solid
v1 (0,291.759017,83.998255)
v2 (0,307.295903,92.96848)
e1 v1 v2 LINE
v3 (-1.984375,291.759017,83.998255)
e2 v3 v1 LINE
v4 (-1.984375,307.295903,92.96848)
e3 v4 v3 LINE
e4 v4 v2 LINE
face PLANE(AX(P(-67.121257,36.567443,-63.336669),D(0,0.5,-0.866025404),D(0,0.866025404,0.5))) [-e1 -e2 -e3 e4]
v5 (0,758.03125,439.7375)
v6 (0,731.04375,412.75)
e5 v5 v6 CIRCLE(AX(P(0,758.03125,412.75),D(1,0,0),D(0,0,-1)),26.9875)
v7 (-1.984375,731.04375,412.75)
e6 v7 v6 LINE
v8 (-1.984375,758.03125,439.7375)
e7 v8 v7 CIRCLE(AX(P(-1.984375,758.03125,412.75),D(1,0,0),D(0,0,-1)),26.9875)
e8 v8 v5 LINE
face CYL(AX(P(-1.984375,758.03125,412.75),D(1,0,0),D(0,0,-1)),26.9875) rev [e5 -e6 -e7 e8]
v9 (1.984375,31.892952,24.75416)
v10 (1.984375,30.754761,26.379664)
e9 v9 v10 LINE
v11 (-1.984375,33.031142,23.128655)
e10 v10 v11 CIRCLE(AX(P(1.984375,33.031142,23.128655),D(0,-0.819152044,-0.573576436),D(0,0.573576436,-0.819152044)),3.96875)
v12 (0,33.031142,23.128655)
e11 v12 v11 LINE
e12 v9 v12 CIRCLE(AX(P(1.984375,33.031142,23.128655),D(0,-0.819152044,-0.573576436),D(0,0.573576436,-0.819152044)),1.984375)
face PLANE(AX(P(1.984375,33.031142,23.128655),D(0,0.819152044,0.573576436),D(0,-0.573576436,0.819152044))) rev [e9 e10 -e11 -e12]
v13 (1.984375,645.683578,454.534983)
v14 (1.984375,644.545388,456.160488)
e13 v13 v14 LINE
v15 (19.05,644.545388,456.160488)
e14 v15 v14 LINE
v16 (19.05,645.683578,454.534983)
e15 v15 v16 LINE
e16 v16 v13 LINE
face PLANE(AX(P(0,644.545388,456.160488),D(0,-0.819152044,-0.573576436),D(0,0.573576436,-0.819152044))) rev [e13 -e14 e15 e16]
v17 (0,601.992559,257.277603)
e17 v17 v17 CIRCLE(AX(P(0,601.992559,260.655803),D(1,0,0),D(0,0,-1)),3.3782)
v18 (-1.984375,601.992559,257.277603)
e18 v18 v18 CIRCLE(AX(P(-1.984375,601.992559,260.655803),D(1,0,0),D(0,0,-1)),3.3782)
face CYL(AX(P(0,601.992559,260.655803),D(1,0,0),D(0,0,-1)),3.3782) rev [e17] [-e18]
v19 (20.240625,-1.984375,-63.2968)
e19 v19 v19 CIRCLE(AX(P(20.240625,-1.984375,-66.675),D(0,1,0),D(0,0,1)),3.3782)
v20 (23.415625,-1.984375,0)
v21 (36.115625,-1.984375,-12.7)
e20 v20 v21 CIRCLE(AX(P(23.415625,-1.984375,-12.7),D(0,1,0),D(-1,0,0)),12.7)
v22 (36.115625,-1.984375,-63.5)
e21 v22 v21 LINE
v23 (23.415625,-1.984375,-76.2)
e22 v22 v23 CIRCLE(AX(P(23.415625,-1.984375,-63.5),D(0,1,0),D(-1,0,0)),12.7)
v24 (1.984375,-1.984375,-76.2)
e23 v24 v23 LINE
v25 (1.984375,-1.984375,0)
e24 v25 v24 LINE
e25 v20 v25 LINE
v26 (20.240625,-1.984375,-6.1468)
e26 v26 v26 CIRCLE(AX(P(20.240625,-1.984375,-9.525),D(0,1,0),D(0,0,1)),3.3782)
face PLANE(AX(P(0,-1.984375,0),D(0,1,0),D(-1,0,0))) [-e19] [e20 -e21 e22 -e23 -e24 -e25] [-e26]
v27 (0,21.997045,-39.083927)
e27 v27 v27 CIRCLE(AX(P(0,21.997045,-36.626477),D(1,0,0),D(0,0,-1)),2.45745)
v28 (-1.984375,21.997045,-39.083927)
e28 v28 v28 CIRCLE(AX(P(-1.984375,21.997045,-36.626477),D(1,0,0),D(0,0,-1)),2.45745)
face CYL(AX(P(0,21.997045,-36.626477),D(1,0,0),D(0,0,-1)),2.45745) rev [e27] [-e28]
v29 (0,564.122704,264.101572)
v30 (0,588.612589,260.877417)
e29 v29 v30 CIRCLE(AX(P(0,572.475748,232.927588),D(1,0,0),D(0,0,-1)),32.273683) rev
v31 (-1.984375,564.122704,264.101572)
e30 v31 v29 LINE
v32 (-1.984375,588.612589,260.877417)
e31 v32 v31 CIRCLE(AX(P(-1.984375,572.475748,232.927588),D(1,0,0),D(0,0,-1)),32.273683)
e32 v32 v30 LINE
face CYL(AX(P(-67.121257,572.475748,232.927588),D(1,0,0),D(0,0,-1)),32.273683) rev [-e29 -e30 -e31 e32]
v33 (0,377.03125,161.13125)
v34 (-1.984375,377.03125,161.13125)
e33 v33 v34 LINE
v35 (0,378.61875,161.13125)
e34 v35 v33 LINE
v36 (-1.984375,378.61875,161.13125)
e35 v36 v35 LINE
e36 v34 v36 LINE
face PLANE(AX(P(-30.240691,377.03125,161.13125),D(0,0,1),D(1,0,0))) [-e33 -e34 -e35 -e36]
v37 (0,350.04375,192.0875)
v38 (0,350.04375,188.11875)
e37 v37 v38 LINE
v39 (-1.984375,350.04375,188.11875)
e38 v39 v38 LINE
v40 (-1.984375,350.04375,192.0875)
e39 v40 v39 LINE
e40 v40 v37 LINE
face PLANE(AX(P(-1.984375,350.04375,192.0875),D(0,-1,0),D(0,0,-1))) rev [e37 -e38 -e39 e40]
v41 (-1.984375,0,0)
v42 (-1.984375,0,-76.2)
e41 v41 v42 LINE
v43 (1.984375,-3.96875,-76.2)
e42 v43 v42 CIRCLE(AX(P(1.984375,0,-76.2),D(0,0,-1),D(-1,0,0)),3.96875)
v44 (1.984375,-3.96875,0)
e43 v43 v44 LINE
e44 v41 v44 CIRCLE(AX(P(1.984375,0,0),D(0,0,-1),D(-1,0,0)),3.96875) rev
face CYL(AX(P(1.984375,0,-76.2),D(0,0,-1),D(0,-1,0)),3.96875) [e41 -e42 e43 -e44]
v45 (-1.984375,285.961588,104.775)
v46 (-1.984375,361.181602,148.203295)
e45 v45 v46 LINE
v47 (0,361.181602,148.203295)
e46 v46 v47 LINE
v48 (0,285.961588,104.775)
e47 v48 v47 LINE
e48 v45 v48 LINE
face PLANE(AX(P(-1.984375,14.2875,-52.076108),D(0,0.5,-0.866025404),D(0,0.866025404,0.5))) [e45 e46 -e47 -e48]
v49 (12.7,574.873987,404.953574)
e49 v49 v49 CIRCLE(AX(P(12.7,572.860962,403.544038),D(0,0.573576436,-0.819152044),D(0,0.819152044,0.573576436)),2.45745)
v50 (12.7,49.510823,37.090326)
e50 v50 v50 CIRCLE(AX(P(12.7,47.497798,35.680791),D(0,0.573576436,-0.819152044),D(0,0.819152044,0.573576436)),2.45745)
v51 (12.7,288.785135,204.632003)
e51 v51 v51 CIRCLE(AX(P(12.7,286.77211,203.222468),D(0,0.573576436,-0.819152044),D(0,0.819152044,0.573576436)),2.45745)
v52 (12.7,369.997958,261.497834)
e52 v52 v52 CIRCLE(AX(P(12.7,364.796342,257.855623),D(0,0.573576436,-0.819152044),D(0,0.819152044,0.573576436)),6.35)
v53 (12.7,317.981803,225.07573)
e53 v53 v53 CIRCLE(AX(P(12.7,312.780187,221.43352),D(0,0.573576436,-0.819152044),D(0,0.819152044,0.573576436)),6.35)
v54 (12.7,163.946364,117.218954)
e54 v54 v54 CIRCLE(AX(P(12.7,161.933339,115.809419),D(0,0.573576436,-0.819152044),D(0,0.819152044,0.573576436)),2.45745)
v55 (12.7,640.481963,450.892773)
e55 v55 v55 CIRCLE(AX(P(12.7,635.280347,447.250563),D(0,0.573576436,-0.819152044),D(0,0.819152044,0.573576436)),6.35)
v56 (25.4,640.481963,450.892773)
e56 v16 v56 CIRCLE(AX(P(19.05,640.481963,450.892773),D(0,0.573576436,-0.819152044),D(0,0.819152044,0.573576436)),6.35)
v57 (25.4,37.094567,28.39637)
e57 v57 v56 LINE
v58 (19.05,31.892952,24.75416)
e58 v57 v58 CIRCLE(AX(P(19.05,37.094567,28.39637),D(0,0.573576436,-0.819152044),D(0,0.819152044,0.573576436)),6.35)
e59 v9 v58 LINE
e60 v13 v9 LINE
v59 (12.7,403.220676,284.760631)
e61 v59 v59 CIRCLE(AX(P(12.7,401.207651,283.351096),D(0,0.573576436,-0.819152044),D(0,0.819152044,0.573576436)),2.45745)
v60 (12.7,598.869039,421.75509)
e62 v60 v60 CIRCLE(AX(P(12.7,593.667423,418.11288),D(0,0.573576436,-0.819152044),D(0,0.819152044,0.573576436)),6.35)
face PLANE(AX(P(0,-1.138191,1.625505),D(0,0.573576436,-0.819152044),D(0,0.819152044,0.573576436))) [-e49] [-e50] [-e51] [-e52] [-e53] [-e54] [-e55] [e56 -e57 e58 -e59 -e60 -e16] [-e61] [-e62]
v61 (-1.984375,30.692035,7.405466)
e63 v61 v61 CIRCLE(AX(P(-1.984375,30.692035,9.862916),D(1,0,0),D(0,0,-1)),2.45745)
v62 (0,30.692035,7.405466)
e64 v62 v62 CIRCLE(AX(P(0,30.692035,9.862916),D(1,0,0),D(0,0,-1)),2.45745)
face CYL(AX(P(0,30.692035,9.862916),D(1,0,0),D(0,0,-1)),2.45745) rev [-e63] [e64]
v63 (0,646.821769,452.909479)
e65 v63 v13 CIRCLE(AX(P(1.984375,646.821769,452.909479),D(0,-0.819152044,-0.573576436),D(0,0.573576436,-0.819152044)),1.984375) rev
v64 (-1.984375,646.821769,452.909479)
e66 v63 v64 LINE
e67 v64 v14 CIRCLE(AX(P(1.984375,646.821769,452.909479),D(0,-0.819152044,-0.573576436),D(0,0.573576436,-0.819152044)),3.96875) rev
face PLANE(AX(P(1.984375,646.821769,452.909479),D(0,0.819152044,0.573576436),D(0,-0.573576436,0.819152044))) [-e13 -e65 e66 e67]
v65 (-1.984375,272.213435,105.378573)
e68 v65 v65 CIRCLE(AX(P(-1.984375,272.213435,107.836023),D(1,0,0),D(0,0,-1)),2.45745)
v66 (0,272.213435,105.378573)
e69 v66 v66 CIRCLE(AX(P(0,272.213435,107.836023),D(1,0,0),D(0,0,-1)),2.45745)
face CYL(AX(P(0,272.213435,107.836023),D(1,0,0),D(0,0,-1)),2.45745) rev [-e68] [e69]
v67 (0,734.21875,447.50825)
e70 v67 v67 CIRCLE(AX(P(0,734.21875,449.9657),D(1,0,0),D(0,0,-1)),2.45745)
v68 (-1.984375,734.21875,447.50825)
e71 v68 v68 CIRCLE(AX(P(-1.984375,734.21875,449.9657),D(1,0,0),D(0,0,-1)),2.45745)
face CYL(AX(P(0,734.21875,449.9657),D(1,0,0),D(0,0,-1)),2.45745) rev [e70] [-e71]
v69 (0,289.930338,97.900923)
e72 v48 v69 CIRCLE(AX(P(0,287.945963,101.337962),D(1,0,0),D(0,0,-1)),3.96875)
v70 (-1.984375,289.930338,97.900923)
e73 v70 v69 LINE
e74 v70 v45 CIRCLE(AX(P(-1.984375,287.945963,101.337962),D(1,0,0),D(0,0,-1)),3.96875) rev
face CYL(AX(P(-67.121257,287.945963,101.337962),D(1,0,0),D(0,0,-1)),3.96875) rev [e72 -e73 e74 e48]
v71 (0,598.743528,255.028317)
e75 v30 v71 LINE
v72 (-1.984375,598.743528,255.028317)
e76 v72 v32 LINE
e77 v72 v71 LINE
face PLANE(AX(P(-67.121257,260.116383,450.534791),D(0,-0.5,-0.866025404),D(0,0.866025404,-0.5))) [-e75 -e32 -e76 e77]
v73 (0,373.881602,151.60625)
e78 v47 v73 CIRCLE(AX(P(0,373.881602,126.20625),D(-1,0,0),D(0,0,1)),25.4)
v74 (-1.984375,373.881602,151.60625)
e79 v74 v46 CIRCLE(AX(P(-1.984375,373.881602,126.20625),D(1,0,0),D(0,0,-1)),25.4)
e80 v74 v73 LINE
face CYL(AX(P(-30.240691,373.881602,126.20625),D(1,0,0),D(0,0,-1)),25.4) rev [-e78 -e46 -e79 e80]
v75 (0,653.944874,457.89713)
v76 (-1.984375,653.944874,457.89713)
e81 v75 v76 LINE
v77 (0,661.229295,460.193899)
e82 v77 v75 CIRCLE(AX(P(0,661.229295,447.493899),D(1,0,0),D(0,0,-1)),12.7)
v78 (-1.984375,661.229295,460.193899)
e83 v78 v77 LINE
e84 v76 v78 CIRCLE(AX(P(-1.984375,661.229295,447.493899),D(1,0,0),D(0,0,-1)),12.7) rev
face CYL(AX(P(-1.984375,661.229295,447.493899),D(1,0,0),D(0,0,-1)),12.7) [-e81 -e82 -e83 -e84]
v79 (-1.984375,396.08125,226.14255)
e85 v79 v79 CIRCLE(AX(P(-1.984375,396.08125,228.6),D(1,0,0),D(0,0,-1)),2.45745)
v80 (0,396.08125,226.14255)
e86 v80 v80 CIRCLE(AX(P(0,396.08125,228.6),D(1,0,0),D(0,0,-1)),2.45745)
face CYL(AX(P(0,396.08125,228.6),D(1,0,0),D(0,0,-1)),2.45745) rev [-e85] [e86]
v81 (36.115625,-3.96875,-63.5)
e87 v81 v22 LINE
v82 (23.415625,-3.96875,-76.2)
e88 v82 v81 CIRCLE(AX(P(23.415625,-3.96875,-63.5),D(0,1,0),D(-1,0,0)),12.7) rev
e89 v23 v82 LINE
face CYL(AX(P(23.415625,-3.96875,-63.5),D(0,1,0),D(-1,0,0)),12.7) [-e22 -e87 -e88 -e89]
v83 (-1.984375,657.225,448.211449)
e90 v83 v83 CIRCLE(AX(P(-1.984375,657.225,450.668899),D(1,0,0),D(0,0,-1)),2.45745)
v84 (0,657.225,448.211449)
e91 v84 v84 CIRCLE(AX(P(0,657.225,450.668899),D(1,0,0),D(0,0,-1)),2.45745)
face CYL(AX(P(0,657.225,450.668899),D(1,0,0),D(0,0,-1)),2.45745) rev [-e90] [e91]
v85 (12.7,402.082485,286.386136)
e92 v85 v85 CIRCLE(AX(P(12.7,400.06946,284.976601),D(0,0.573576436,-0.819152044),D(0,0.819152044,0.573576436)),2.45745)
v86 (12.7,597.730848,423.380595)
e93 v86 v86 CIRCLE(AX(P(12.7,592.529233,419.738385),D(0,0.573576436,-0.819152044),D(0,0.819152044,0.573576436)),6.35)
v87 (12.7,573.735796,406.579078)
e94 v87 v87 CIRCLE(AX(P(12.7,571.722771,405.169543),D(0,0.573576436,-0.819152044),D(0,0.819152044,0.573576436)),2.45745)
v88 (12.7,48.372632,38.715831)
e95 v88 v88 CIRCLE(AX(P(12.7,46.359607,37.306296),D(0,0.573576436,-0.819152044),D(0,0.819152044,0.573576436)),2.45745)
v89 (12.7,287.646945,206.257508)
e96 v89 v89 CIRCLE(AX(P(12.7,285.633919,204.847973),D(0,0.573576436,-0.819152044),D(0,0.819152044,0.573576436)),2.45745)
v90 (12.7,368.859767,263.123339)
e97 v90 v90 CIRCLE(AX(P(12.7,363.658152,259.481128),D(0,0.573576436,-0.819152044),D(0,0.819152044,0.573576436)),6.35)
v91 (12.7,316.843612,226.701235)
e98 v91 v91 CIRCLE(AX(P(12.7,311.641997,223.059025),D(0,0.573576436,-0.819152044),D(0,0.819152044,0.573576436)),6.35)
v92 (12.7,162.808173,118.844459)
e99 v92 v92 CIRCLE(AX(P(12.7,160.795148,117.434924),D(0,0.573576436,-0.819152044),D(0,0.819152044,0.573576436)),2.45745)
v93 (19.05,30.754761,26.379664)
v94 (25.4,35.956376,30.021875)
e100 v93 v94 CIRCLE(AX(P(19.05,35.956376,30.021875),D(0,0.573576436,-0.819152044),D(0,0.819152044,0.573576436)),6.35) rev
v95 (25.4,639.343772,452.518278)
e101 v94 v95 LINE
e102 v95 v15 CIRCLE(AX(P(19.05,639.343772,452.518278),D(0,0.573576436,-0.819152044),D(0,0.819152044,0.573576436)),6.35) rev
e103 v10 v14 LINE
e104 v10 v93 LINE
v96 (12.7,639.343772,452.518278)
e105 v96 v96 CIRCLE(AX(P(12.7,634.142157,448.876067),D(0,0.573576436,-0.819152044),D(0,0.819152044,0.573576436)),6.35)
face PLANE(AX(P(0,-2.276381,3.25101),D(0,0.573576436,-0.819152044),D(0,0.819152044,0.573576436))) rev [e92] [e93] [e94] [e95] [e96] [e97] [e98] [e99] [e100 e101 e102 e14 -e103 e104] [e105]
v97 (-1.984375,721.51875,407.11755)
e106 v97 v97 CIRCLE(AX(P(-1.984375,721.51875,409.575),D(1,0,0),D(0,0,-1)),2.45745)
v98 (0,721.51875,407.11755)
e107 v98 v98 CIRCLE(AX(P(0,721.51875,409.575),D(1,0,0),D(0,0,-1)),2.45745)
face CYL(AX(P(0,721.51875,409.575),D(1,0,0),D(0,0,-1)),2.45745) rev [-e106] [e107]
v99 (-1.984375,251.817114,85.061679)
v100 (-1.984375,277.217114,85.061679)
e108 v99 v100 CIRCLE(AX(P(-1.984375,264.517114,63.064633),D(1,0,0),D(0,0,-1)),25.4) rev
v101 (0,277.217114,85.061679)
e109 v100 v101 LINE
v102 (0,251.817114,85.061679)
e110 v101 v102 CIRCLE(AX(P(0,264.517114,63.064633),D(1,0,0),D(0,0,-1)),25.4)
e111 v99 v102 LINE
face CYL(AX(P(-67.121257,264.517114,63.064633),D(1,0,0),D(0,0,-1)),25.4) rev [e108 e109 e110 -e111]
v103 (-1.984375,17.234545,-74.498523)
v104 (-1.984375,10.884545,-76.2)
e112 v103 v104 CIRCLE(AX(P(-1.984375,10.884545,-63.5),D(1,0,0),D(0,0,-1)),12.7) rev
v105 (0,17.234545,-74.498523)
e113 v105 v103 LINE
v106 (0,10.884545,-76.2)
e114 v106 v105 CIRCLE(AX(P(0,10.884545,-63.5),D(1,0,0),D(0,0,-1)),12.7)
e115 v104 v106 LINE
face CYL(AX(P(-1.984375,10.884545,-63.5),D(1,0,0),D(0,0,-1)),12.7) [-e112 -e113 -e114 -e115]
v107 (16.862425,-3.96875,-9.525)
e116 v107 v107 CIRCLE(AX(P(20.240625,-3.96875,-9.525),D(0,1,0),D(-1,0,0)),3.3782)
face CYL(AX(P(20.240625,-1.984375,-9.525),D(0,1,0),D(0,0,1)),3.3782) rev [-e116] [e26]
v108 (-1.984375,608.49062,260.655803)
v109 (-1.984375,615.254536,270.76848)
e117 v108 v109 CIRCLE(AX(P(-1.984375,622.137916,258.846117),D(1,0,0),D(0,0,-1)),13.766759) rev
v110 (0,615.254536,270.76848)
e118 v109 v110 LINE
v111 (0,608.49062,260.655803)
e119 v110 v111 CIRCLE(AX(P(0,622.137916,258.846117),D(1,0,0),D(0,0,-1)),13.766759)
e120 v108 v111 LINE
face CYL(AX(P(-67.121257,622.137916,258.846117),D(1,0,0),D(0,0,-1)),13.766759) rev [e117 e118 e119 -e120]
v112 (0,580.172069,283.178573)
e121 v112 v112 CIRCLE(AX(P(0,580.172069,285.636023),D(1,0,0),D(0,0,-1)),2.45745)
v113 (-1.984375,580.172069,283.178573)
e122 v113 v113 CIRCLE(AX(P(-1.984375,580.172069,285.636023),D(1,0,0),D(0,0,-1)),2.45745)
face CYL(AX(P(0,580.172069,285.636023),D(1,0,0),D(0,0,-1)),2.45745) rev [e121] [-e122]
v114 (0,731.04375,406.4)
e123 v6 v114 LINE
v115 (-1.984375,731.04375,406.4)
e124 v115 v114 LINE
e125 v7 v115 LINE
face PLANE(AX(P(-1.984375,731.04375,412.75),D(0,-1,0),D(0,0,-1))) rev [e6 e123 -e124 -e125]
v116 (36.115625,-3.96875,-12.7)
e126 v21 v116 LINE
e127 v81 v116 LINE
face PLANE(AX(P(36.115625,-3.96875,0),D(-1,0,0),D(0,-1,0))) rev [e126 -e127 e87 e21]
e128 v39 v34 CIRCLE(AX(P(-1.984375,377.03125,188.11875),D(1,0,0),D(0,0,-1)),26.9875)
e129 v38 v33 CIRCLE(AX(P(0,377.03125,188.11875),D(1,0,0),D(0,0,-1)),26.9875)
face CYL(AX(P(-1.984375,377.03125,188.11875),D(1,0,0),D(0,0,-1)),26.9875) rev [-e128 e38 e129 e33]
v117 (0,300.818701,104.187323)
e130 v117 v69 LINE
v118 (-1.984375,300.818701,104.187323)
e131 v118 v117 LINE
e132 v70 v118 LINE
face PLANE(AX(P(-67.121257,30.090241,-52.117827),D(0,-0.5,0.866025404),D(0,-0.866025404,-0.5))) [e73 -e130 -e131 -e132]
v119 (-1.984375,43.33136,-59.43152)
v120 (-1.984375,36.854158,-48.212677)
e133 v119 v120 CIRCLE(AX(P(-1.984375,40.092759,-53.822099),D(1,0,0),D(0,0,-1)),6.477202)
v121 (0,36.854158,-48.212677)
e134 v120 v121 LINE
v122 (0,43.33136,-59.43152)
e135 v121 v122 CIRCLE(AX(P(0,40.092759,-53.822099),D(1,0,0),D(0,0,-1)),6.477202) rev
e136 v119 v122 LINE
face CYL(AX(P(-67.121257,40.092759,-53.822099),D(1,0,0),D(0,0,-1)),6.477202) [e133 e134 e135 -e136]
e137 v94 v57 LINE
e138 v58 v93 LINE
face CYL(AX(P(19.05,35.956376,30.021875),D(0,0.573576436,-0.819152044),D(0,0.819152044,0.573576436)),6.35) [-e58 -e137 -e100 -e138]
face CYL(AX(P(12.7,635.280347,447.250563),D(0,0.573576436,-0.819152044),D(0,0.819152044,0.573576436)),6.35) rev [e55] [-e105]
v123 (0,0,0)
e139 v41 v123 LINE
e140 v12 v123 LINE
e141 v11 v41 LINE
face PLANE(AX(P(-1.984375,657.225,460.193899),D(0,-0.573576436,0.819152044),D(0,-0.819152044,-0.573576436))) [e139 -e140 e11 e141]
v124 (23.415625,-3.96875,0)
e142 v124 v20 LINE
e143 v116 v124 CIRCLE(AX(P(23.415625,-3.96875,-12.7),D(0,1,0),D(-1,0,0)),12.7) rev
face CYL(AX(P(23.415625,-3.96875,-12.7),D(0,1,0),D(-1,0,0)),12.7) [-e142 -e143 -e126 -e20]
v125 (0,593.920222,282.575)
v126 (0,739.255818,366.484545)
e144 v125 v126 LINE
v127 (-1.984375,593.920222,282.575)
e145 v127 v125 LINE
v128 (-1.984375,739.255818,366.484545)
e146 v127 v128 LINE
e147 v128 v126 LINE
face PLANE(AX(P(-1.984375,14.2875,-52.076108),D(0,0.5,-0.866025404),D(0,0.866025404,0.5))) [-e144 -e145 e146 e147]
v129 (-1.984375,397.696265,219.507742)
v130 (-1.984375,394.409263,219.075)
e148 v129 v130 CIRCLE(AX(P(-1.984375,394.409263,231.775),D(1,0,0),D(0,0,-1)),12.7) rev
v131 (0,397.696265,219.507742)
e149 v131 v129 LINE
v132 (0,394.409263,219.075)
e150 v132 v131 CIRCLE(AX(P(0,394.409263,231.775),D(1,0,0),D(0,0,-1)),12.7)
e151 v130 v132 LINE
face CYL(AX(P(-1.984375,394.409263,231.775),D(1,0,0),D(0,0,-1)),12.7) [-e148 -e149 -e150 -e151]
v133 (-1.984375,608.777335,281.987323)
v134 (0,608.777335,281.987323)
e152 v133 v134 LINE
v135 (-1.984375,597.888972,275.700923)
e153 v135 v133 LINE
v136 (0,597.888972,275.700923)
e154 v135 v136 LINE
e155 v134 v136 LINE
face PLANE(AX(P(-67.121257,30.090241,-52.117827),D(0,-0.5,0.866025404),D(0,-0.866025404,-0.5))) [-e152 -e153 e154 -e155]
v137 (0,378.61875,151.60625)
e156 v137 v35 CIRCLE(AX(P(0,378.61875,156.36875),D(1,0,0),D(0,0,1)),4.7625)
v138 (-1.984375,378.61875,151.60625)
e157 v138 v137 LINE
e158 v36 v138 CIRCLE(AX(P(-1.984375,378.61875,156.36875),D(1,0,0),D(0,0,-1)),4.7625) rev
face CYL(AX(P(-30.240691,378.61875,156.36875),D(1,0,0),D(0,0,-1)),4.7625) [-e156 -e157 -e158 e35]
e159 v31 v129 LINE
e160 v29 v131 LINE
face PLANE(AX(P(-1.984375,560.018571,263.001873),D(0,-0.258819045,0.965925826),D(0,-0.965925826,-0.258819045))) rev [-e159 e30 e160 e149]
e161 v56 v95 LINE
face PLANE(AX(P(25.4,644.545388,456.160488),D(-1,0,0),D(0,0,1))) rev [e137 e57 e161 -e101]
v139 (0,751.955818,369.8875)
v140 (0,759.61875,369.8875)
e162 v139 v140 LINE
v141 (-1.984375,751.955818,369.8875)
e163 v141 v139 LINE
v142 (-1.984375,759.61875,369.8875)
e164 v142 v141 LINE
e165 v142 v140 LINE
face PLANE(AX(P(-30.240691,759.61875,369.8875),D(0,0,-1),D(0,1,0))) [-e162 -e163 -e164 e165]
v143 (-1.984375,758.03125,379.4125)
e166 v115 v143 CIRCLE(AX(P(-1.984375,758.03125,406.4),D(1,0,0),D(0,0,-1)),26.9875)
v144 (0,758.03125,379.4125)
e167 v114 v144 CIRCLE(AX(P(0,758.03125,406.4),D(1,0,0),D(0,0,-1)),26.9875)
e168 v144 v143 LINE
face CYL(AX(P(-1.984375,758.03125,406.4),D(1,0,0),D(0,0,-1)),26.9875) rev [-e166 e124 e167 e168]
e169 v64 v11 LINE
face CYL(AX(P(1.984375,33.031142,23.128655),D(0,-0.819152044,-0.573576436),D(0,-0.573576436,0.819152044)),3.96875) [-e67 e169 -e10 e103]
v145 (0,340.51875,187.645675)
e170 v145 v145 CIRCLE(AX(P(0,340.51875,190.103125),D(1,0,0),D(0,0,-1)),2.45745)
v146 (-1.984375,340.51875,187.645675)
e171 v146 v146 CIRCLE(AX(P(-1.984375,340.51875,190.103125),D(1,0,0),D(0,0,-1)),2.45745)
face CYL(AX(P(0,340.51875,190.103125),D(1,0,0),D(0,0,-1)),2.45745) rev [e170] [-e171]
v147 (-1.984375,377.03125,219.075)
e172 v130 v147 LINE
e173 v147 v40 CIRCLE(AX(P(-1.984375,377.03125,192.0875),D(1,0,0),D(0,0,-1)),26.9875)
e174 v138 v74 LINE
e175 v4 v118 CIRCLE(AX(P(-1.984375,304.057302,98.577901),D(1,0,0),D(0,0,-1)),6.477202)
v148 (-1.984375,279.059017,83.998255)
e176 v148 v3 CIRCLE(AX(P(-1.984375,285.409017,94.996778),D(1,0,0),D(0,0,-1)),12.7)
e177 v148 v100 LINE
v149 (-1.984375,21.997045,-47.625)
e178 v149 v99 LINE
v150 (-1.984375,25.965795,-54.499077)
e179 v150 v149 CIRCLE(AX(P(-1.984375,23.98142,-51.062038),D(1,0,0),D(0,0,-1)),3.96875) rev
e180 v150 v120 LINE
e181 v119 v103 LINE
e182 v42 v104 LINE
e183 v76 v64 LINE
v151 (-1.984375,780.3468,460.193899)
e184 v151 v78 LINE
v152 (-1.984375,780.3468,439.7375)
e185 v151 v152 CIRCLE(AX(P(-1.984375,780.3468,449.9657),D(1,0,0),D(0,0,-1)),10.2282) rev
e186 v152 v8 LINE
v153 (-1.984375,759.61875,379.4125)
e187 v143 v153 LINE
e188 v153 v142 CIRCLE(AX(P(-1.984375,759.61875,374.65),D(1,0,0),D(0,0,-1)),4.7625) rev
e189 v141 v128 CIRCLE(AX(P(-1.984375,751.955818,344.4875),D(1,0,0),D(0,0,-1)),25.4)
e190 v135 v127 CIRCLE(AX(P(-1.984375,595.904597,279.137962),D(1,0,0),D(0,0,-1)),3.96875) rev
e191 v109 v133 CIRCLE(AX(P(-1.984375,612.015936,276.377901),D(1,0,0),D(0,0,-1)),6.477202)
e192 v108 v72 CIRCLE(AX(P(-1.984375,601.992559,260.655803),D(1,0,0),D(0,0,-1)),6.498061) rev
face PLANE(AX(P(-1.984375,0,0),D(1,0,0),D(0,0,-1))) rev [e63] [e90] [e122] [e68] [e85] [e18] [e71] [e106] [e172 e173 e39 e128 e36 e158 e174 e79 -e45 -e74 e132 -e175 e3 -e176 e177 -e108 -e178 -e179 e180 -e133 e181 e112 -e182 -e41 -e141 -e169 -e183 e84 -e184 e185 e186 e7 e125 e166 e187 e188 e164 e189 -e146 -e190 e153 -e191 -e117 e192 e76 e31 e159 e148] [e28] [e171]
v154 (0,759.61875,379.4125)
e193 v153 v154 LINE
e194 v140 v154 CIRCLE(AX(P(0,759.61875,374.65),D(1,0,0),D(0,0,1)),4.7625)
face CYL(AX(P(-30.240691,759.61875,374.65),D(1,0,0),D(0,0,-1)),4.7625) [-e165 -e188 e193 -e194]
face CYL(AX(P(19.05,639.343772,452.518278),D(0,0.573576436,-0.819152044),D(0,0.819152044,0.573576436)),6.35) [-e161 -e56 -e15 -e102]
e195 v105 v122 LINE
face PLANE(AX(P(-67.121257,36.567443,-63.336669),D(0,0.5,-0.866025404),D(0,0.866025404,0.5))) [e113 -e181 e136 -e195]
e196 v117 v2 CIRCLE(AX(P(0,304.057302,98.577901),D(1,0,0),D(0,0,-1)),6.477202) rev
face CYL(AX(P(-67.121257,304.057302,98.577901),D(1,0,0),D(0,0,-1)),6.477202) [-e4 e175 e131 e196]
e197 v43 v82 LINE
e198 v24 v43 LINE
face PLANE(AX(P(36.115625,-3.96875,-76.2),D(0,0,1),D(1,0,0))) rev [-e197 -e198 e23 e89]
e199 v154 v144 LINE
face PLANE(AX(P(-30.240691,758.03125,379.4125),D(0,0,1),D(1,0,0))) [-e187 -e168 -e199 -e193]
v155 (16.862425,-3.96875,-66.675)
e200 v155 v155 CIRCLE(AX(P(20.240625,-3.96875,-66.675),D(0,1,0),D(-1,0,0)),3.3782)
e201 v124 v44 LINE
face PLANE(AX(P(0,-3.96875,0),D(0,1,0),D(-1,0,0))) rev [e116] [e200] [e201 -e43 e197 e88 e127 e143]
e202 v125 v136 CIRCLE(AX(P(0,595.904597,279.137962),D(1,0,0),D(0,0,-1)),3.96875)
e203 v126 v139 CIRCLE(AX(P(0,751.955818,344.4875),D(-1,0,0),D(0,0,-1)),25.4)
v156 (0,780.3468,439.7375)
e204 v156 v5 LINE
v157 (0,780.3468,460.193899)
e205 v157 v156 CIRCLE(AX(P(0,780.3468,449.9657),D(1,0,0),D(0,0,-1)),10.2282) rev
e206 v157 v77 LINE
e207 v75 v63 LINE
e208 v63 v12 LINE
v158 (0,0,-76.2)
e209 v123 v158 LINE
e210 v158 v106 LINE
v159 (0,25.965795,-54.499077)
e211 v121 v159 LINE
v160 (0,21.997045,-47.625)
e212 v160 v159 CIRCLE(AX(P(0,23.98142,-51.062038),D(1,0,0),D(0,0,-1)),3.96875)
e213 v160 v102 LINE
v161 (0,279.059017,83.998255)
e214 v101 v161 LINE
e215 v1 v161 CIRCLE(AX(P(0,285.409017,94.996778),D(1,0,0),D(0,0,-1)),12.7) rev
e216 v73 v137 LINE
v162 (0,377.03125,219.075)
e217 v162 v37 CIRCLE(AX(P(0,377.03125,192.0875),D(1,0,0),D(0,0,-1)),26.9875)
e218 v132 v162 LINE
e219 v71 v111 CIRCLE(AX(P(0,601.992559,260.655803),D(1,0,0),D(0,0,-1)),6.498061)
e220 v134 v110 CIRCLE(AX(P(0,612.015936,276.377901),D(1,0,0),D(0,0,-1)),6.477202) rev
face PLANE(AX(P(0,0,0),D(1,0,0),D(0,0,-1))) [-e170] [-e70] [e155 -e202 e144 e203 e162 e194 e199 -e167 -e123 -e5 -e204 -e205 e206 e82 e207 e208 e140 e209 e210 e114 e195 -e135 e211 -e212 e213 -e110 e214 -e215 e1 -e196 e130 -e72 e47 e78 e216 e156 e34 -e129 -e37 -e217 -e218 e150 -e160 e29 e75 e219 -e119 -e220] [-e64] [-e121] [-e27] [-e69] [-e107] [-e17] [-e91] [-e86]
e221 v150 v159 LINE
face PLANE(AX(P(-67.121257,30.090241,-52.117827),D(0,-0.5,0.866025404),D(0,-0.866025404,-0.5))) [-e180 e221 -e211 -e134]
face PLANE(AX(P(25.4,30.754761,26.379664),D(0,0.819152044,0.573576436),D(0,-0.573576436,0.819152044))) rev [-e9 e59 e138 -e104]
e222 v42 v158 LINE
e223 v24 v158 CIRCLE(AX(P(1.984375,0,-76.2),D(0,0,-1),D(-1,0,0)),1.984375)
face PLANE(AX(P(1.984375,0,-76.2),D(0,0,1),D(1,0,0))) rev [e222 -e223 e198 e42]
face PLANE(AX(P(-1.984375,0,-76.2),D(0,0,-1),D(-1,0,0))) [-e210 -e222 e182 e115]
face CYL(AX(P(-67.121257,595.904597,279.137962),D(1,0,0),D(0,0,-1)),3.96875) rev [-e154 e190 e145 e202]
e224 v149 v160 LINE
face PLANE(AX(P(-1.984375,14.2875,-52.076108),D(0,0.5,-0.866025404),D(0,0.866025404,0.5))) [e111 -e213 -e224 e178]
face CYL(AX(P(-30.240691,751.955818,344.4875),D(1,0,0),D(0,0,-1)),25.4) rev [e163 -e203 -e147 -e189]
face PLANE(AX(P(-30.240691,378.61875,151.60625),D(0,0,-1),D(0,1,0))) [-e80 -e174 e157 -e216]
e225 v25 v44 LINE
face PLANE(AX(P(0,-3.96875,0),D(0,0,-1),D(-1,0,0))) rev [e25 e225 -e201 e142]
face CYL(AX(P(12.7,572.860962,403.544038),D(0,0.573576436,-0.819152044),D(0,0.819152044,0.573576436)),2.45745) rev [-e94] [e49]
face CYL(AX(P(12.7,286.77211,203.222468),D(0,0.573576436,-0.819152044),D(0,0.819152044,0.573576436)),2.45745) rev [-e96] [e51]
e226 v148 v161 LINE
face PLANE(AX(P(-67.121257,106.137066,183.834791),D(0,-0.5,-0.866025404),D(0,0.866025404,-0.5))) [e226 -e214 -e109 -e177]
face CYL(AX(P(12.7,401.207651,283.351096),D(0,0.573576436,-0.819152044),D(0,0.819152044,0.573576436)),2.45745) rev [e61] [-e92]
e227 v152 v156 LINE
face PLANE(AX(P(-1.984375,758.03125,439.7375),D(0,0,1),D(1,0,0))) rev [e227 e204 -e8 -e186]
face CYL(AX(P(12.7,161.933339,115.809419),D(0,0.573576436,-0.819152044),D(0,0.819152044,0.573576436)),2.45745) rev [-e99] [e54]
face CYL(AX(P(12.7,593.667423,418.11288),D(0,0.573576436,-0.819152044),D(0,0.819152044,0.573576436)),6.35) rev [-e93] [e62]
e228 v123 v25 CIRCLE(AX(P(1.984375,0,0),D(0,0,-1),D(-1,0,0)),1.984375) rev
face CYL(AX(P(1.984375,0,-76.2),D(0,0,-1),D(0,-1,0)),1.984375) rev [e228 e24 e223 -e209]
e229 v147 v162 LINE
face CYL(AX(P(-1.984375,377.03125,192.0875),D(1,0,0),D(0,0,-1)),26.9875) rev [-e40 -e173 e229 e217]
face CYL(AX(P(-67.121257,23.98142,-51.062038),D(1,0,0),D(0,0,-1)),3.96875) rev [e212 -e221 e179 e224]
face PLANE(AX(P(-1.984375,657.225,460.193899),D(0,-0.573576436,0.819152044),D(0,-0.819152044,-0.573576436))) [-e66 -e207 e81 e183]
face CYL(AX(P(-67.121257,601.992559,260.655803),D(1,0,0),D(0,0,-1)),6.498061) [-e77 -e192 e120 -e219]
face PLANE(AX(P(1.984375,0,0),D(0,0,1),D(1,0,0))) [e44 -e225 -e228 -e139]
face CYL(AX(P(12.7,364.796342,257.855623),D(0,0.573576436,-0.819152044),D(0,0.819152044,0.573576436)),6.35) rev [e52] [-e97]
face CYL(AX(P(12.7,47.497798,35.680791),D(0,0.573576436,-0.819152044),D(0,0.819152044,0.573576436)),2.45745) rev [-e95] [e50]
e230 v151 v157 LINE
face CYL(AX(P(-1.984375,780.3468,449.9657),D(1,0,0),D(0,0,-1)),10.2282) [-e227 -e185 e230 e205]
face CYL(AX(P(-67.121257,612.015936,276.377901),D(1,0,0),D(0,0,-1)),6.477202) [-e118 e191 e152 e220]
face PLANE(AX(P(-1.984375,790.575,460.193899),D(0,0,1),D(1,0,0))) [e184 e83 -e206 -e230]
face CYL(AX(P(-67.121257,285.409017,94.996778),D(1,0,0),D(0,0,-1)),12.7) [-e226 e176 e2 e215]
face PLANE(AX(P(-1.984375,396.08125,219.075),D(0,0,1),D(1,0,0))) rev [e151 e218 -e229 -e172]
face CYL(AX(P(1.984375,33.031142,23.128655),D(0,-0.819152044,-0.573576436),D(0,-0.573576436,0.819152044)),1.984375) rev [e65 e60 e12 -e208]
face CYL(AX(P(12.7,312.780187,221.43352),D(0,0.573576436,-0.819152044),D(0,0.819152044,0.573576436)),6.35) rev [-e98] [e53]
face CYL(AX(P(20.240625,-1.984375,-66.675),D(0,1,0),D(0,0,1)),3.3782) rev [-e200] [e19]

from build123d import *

# Parameters (mm, degrees)
BASE_FLANGE1_DEPTH                = 1.984375
LOW_RING_SLOT_ONLY_DEPTH          = 915.762916455
HIGH_RING_SLOT_ONLY_DEPTH         = 915.762916455
RING_HOLES_VERTICAL_DEPTH         = 915.762916455
HOOKS_DEPTH                       = 1.984375
CHAIN_PIN_HOLE_D                  = 6.7564
RING_RETAINER_LIP_DEPTH           = 1.984375
ROUNDING_TOP_DEPTH                = 915.762916455
BACK_FLANGE_DEPTH                 = 749.3
BOTTOM_FLANGE_DEPTH               = 76.2
RIVET_HOLES_HOLE_WIZARD_D         = 4.9149
ROUNDING_REMAINING_EDGES_R        = 12.7
BOLT_TO_BASE_HOLE_WIZARD_D        = 6.7564
HOLES_FOR_120LB_CABLE_TIES_D      = 12.7
RIVETS_TO_BACKING_PART_D          = 4.9149
FILLET_FOR_FLANGE_TO_BACK_PIECE_R = 6.35
FILLET_FOR_BOTTOM_FLANGE_R        = 12.7


# Sheet-metal steps are written as plain solids
with BuildPart() as part:
    # Sketch1 → Base-Flange1 (new body)
    with BuildSketch(Plane(origin=(0, 0, 0), x_dir=(0, 0, -1), z_dir=(1, 0, 0))):
        Polygon((-460.1938993, 657.225), (0, 0), (76.2, 0), (76.2, 14.2875), (52.076108029, 14.2875), (-396.113689065, 790.575), (-460.1938993, 790.575), align=None)
    extrude(amount=-BASE_FLANGE1_DEPTH)

    # Sketch2 → low ring slot only (cut, through all)
    with BuildSketch(Plane(origin=(0, 0, 0), x_dir=(0, 0, -1), z_dir=(1, 0, 0))):
        with BuildLine():
            Line((-192.0875, 404.01875), (-188.11875, 404.01875))
            ThreePointArc((-188.11875, 404.01875), (-161.13125, 377.03125), (-188.11875, 350.04375))
            Line((-188.11875, 350.04375), (-192.0875, 350.04375))
            ThreePointArc((-192.0875, 350.04375), (-219.075, 377.03125), (-192.0875, 404.01875))
        make_face()
    extrude(amount=-LOW_RING_SLOT_ONLY_DEPTH, mode=Mode.SUBTRACT)

    # Sketch3 → high ring slot only (cut, through all)
    with BuildSketch(Plane(origin=(0, 0, 0), x_dir=(0, 0, -1), z_dir=(1, 0, 0))):
        with BuildLine():
            Line((-412.75, 785.01875), (-406.4, 785.01875))
            ThreePointArc((-406.4, 785.01875), (-379.4125, 758.03125), (-406.4, 731.04375))
            Line((-406.4, 731.04375), (-412.75, 731.04375))
            ThreePointArc((-412.75, 731.04375), (-439.7375, 758.03125), (-412.75, 785.01875))
        make_face()
    extrude(amount=-HIGH_RING_SLOT_ONLY_DEPTH, mode=Mode.SUBTRACT)

    # Sketch6 → ring holes vertical (cut, through all)
    with BuildSketch(Plane(origin=(0, 0, 0), x_dir=(0, 0, -1), z_dir=(1, 0, 0))):
        Polygon((-157.35409368, 377.03125), (-263.001872817, 560.018571172), (-219.075, 396.08125), (-219.075, 377.03125), (-161.13125, 377.03125), align=None)
        Polygon((-439.7375, 758.03125), (-439.7375, 790.575), (-396.113689065, 790.575), (-377.324546242, 758.03125), (-379.4125, 758.03125), align=None)
    extrude(amount=-RING_HOLES_VERTICAL_DEPTH, mode=Mode.SUBTRACT)

    # Sketch4 → hooks (add)
    with BuildSketch(Plane(origin=(0, 0, 0), x_dir=(0, 0, -1), z_dir=(1, 0, 0))):
        with BuildLine():
            ThreePointArc((54.499076643, 25.965795256), (53.046413321, 20.544381935), (47.625, 21.997045256))
            Line((47.625, 21.997045256), (52.076108029, 14.2875))
            Line((52.076108029, 14.2875), (76.2, 14.2875))
            Line((76.2, 14.2875), (59.4315198, 43.331359673))
            ThreePointArc((59.4315198, 43.331359673), (50.58349781, 45.702180019), (48.212677464, 36.85415803))
            Line((48.212677464, 36.85415803), (54.499076643, 25.965795256))
        make_face()
        with BuildLine():
            ThreePointArc((-97.900923357, 289.93033833), (-99.353586679, 284.508925008), (-104.775, 285.96158833))
            Line((-104.775, 285.96158833), (-85.061678589, 251.817114059))
            ThreePointArc((-85.061678589, 251.817114059), (-88.464633332, 264.517114059), (-85.061678589, 277.217114059))
            Line((-85.061678589, 277.217114059), (-83.998255231, 279.059017344))
            ThreePointArc((-83.998255231, 279.059017344), (-82.296777859, 285.409017344), (-83.998255231, 291.759017344))
            Line((-83.998255231, 291.759017344), (-92.9684802, 307.295902746))
            ThreePointArc((-92.9684802, 307.295902746), (-101.81650219, 309.666723093), (-104.187322536, 300.818701104))
            Line((-104.187322536, 300.818701104), (-97.900923357, 289.93033833))
        make_face()
        with BuildLine():
            ThreePointArc((-264.101571882, 564.122703953), (-264.925165118, 576.688308533), (-260.877417362, 588.612588904))
            Line((-260.877417362, 588.612588904), (-255.028316879, 598.743528119))
            ThreePointArc((-255.028316879, 598.743528119), (-255.028316879, 605.241589069), (-260.655802737, 608.490619543))
            ThreePointArc((-260.655802737, 608.490619543), (-266.499869955, 610.694851427), (-270.7684802, 615.254536332))
            ThreePointArc((-270.7684802, 615.254536332), (-279.61650219, 617.625356679), (-281.987322536, 608.77733469))
            Line((-281.987322536, 608.77733469), (-275.700923357, 597.888971915))
            ThreePointArc((-275.700923357, 597.888971915), (-277.153586679, 592.467558594), (-282.575, 593.920221915))
            Line((-282.575, 593.920221915), (-263.001872817, 560.018571172))
            Line((-263.001872817, 560.018571172), (-264.101571882, 564.122703953))
        make_face()
    extrude(amount=-HOOKS_DEPTH)

    # chain pin hole (through all)
    with Locations(Plane(origin=(0, 0, 0), x_dir=(0, 0, -1), z_dir=(1, 0, 0))):
        with Locations((-260.655802737, 601.992558594)):
            Hole(CHAIN_PIN_HOLE_D / 2)

    # Sketch7 → ring retainer lip (add)
    with BuildSketch(Plane(origin=(0, 0, 0), x_dir=(0, 0, -1), z_dir=(1, 0, 0))):
        with BuildLine():
            Line((-161.13125, 377.03125), (-161.13125, 378.61875))
            ThreePointArc((-161.13125, 378.61875), (-156.36875, 383.38125), (-151.60625, 378.61875))
            Line((-151.60625, 378.61875), (-151.60625, 373.881602199))
            ThreePointArc((-151.60625, 373.881602199), (-150.740765988, 367.307598454), (-148.203295256, 361.181602199))
            Line((-148.203295256, 361.181602199), (-157.35409368, 377.03125))
            Line((-157.35409368, 377.03125), (-161.13125, 377.03125))
        make_face()
        with BuildLine():
            Line((-379.4125, 758.03125), (-379.4125, 759.61875))
            ThreePointArc((-379.4125, 759.61875), (-374.65, 764.38125), (-369.8875, 759.61875))
            Line((-369.8875, 759.61875), (-369.8875, 751.955817539))
            ThreePointArc((-369.8875, 751.955817539), (-369.022015988, 745.381813793), (-366.484545256, 739.255817539))
            Line((-366.484545256, 739.255817539), (-377.324546242, 758.03125))
            Line((-377.324546242, 758.03125), (-379.4125, 758.03125))
        make_face()
    extrude(amount=-RING_RETAINER_LIP_DEPTH)

    # Sketch9 → rounding top (cut, through all)
    with BuildSketch(Plane(origin=(0, 0, 0), x_dir=(0, 0, -1), z_dir=(1, 0, 0))):
        with BuildLine():
            Line((-460.1938993, 790.575), (-460.1938993, 780.34680035))
            ThreePointArc((-460.1938993, 780.34680035), (-457.198128982, 787.579229682), (-449.96569965, 790.575))
            Line((-449.96569965, 790.575), (-460.1938993, 790.575))
        make_face()
        with BuildLine():
            Line((-439.7375, 790.575), (-449.96569965, 790.575))
            ThreePointArc((-449.96569965, 790.575), (-442.733270318, 787.579229682), (-439.7375, 780.34680035))
            Line((-439.7375, 780.34680035), (-439.7375, 790.575))
        make_face()
    extrude(amount=-ROUNDING_TOP_DEPTH, mode=Mode.SUBTRACT)

    # back flange section (across the edge) → back flange (add)
    with BuildSketch(Plane(origin=(0, 645.683578297, 454.534983396), x_dir=(3.4914813388431334e-15, 0.5735764363510447, -0.8191520442889929), z_dir=(0, -0.8191520442889929, -0.5735764363510447))):
        with BuildLine():
            Line((-1.984375, 1.984375), (-1.984375, 25.4))
            Line((-1.984375, 25.4), (0, 25.4))
            Line((0, 25.4), (0, 1.984375))
            ThreePointArc((0, 1.984375), (0.581209981, 0.581209981), (1.984375, 0))
            Line((1.984375, 0), (1.984375, -1.984375))
            ThreePointArc((1.984375, -1.984375), (-0.821955038, -0.821955038), (-1.984375, 1.984375))
        make_face()
    extrude(amount=BACK_FLANGE_DEPTH)

    # bottom flange section (across the edge) → bottom flange (add)
    with BuildSketch(Plane(origin=(0, -1.984375, 0), x_dir=(0, 1, 0), z_dir=(0, 0, -1))):
        with BuildLine():
            Line((-1.984375, 1.984375), (-1.984375, 36.115625))
            Line((-1.984375, 36.115625), (0, 36.115625))
            Line((0, 36.115625), (0, 1.984375))
            ThreePointArc((0, 1.984375), (0.581209981, 0.581209981), (1.984375, 0))
            Line((1.984375, 0), (1.984375, -1.984375))
            ThreePointArc((1.984375, -1.984375), (-0.821955038, -0.821955038), (-1.984375, 1.984375))
        make_face()
    extrude(amount=BOTTOM_FLANGE_DEPTH)

    # rivet holes hole wizard (through all)
    with Locations(Plane(origin=(0, 0, 0), x_dir=(0, 0, -1), z_dir=(1, 0, 0))):
        with Locations((-449.96569965, 734.21875), (-409.575, 721.51875), (-450.6688993, 657.225), (-285.636022628, 580.17206863), (-228.6, 396.08125), (-190.103125, 340.51875), (-107.836022628, 272.213435045), (-9.862916022, 30.692034586), (36.626477372, 21.997045256)):
            Hole(RIVET_HOLES_HOLE_WIZARD_D / 2)

    # rounding remaining edges
    rounding_remaining_edges_edges = [part.edges().sort_by_distance(p)[0] for p in [
        (-0.9921875, 657.225, 460.1938993),
        (-0.9921875, 14.2875, -76.2),
        (-0.9921875, 396.08125, 219.075),
    ]]
    fillet(rounding_remaining_edges_edges, radius=ROUNDING_REMAINING_EDGES_R)

    # bolt to base hole wizard (through all)
    with Locations(Plane(origin=(0, -1.984375, 0), x_dir=(1, 0, 0), z_dir=(0, 1, 0))):
        with Locations((20.240625, 66.675), (20.240625, 9.525)):
            Hole(BOLT_TO_BASE_HOLE_WIZARD_D / 2)

    # holes for 120lb cable ties (through all)
    with Locations(Plane(origin=(0, -1.138190741, 1.625504838), x_dir=(-1, 0, 0), z_dir=(3.580478189914983e-15, 0.5735764363510447, -0.8191520442889927))):
        with Locations((-12.7, 776.923579099), (-12.7, 726.123579099), (-12.7, 446.723579099), (-12.7, 383.223579099)):
            Hole(HOLES_FOR_120LB_CABLE_TIES_D / 2)

    # rivets to backing part (through all)
    with Locations(Plane(origin=(0, -1.138190741, 1.625504838), x_dir=(-1, 0, 0), z_dir=(3.580478189914983e-15, 0.5735764363510447, -0.8191520442889927))):
        with Locations((-12.7, 700.723579099), (-12.7, 491.173579099), (-12.7, 351.473579099), (-12.7, 199.073579099), (-12.7, 59.373579099)):
            Hole(RIVETS_TO_BACKING_PART_D / 2)

    # fillet for flange to back piece
    fillet_for_flange_to_back_piece_edges = [part.edges().sort_by_distance(p)[0] for p in [
        (25.4, 645.114482926, 455.347735815),
        (25.4, 31.32385614, 25.566912057),
    ]]
    fillet(fillet_for_flange_to_back_piece_edges, radius=FILLET_FOR_FLANGE_TO_BACK_PIECE_R)

    # fillet for bottom flange
    fillet_for_bottom_flange_edges = [part.edges().sort_by_distance(p)[0] for p in [
        (36.115625, -2.9765625, 0),
        (36.115625, -2.9765625, -76.2),
    ]]
    fillet(fillet_for_bottom_flange_edges, radius=FILLET_FOR_BOTTOM_FLANGE_R)


solid = part.part
